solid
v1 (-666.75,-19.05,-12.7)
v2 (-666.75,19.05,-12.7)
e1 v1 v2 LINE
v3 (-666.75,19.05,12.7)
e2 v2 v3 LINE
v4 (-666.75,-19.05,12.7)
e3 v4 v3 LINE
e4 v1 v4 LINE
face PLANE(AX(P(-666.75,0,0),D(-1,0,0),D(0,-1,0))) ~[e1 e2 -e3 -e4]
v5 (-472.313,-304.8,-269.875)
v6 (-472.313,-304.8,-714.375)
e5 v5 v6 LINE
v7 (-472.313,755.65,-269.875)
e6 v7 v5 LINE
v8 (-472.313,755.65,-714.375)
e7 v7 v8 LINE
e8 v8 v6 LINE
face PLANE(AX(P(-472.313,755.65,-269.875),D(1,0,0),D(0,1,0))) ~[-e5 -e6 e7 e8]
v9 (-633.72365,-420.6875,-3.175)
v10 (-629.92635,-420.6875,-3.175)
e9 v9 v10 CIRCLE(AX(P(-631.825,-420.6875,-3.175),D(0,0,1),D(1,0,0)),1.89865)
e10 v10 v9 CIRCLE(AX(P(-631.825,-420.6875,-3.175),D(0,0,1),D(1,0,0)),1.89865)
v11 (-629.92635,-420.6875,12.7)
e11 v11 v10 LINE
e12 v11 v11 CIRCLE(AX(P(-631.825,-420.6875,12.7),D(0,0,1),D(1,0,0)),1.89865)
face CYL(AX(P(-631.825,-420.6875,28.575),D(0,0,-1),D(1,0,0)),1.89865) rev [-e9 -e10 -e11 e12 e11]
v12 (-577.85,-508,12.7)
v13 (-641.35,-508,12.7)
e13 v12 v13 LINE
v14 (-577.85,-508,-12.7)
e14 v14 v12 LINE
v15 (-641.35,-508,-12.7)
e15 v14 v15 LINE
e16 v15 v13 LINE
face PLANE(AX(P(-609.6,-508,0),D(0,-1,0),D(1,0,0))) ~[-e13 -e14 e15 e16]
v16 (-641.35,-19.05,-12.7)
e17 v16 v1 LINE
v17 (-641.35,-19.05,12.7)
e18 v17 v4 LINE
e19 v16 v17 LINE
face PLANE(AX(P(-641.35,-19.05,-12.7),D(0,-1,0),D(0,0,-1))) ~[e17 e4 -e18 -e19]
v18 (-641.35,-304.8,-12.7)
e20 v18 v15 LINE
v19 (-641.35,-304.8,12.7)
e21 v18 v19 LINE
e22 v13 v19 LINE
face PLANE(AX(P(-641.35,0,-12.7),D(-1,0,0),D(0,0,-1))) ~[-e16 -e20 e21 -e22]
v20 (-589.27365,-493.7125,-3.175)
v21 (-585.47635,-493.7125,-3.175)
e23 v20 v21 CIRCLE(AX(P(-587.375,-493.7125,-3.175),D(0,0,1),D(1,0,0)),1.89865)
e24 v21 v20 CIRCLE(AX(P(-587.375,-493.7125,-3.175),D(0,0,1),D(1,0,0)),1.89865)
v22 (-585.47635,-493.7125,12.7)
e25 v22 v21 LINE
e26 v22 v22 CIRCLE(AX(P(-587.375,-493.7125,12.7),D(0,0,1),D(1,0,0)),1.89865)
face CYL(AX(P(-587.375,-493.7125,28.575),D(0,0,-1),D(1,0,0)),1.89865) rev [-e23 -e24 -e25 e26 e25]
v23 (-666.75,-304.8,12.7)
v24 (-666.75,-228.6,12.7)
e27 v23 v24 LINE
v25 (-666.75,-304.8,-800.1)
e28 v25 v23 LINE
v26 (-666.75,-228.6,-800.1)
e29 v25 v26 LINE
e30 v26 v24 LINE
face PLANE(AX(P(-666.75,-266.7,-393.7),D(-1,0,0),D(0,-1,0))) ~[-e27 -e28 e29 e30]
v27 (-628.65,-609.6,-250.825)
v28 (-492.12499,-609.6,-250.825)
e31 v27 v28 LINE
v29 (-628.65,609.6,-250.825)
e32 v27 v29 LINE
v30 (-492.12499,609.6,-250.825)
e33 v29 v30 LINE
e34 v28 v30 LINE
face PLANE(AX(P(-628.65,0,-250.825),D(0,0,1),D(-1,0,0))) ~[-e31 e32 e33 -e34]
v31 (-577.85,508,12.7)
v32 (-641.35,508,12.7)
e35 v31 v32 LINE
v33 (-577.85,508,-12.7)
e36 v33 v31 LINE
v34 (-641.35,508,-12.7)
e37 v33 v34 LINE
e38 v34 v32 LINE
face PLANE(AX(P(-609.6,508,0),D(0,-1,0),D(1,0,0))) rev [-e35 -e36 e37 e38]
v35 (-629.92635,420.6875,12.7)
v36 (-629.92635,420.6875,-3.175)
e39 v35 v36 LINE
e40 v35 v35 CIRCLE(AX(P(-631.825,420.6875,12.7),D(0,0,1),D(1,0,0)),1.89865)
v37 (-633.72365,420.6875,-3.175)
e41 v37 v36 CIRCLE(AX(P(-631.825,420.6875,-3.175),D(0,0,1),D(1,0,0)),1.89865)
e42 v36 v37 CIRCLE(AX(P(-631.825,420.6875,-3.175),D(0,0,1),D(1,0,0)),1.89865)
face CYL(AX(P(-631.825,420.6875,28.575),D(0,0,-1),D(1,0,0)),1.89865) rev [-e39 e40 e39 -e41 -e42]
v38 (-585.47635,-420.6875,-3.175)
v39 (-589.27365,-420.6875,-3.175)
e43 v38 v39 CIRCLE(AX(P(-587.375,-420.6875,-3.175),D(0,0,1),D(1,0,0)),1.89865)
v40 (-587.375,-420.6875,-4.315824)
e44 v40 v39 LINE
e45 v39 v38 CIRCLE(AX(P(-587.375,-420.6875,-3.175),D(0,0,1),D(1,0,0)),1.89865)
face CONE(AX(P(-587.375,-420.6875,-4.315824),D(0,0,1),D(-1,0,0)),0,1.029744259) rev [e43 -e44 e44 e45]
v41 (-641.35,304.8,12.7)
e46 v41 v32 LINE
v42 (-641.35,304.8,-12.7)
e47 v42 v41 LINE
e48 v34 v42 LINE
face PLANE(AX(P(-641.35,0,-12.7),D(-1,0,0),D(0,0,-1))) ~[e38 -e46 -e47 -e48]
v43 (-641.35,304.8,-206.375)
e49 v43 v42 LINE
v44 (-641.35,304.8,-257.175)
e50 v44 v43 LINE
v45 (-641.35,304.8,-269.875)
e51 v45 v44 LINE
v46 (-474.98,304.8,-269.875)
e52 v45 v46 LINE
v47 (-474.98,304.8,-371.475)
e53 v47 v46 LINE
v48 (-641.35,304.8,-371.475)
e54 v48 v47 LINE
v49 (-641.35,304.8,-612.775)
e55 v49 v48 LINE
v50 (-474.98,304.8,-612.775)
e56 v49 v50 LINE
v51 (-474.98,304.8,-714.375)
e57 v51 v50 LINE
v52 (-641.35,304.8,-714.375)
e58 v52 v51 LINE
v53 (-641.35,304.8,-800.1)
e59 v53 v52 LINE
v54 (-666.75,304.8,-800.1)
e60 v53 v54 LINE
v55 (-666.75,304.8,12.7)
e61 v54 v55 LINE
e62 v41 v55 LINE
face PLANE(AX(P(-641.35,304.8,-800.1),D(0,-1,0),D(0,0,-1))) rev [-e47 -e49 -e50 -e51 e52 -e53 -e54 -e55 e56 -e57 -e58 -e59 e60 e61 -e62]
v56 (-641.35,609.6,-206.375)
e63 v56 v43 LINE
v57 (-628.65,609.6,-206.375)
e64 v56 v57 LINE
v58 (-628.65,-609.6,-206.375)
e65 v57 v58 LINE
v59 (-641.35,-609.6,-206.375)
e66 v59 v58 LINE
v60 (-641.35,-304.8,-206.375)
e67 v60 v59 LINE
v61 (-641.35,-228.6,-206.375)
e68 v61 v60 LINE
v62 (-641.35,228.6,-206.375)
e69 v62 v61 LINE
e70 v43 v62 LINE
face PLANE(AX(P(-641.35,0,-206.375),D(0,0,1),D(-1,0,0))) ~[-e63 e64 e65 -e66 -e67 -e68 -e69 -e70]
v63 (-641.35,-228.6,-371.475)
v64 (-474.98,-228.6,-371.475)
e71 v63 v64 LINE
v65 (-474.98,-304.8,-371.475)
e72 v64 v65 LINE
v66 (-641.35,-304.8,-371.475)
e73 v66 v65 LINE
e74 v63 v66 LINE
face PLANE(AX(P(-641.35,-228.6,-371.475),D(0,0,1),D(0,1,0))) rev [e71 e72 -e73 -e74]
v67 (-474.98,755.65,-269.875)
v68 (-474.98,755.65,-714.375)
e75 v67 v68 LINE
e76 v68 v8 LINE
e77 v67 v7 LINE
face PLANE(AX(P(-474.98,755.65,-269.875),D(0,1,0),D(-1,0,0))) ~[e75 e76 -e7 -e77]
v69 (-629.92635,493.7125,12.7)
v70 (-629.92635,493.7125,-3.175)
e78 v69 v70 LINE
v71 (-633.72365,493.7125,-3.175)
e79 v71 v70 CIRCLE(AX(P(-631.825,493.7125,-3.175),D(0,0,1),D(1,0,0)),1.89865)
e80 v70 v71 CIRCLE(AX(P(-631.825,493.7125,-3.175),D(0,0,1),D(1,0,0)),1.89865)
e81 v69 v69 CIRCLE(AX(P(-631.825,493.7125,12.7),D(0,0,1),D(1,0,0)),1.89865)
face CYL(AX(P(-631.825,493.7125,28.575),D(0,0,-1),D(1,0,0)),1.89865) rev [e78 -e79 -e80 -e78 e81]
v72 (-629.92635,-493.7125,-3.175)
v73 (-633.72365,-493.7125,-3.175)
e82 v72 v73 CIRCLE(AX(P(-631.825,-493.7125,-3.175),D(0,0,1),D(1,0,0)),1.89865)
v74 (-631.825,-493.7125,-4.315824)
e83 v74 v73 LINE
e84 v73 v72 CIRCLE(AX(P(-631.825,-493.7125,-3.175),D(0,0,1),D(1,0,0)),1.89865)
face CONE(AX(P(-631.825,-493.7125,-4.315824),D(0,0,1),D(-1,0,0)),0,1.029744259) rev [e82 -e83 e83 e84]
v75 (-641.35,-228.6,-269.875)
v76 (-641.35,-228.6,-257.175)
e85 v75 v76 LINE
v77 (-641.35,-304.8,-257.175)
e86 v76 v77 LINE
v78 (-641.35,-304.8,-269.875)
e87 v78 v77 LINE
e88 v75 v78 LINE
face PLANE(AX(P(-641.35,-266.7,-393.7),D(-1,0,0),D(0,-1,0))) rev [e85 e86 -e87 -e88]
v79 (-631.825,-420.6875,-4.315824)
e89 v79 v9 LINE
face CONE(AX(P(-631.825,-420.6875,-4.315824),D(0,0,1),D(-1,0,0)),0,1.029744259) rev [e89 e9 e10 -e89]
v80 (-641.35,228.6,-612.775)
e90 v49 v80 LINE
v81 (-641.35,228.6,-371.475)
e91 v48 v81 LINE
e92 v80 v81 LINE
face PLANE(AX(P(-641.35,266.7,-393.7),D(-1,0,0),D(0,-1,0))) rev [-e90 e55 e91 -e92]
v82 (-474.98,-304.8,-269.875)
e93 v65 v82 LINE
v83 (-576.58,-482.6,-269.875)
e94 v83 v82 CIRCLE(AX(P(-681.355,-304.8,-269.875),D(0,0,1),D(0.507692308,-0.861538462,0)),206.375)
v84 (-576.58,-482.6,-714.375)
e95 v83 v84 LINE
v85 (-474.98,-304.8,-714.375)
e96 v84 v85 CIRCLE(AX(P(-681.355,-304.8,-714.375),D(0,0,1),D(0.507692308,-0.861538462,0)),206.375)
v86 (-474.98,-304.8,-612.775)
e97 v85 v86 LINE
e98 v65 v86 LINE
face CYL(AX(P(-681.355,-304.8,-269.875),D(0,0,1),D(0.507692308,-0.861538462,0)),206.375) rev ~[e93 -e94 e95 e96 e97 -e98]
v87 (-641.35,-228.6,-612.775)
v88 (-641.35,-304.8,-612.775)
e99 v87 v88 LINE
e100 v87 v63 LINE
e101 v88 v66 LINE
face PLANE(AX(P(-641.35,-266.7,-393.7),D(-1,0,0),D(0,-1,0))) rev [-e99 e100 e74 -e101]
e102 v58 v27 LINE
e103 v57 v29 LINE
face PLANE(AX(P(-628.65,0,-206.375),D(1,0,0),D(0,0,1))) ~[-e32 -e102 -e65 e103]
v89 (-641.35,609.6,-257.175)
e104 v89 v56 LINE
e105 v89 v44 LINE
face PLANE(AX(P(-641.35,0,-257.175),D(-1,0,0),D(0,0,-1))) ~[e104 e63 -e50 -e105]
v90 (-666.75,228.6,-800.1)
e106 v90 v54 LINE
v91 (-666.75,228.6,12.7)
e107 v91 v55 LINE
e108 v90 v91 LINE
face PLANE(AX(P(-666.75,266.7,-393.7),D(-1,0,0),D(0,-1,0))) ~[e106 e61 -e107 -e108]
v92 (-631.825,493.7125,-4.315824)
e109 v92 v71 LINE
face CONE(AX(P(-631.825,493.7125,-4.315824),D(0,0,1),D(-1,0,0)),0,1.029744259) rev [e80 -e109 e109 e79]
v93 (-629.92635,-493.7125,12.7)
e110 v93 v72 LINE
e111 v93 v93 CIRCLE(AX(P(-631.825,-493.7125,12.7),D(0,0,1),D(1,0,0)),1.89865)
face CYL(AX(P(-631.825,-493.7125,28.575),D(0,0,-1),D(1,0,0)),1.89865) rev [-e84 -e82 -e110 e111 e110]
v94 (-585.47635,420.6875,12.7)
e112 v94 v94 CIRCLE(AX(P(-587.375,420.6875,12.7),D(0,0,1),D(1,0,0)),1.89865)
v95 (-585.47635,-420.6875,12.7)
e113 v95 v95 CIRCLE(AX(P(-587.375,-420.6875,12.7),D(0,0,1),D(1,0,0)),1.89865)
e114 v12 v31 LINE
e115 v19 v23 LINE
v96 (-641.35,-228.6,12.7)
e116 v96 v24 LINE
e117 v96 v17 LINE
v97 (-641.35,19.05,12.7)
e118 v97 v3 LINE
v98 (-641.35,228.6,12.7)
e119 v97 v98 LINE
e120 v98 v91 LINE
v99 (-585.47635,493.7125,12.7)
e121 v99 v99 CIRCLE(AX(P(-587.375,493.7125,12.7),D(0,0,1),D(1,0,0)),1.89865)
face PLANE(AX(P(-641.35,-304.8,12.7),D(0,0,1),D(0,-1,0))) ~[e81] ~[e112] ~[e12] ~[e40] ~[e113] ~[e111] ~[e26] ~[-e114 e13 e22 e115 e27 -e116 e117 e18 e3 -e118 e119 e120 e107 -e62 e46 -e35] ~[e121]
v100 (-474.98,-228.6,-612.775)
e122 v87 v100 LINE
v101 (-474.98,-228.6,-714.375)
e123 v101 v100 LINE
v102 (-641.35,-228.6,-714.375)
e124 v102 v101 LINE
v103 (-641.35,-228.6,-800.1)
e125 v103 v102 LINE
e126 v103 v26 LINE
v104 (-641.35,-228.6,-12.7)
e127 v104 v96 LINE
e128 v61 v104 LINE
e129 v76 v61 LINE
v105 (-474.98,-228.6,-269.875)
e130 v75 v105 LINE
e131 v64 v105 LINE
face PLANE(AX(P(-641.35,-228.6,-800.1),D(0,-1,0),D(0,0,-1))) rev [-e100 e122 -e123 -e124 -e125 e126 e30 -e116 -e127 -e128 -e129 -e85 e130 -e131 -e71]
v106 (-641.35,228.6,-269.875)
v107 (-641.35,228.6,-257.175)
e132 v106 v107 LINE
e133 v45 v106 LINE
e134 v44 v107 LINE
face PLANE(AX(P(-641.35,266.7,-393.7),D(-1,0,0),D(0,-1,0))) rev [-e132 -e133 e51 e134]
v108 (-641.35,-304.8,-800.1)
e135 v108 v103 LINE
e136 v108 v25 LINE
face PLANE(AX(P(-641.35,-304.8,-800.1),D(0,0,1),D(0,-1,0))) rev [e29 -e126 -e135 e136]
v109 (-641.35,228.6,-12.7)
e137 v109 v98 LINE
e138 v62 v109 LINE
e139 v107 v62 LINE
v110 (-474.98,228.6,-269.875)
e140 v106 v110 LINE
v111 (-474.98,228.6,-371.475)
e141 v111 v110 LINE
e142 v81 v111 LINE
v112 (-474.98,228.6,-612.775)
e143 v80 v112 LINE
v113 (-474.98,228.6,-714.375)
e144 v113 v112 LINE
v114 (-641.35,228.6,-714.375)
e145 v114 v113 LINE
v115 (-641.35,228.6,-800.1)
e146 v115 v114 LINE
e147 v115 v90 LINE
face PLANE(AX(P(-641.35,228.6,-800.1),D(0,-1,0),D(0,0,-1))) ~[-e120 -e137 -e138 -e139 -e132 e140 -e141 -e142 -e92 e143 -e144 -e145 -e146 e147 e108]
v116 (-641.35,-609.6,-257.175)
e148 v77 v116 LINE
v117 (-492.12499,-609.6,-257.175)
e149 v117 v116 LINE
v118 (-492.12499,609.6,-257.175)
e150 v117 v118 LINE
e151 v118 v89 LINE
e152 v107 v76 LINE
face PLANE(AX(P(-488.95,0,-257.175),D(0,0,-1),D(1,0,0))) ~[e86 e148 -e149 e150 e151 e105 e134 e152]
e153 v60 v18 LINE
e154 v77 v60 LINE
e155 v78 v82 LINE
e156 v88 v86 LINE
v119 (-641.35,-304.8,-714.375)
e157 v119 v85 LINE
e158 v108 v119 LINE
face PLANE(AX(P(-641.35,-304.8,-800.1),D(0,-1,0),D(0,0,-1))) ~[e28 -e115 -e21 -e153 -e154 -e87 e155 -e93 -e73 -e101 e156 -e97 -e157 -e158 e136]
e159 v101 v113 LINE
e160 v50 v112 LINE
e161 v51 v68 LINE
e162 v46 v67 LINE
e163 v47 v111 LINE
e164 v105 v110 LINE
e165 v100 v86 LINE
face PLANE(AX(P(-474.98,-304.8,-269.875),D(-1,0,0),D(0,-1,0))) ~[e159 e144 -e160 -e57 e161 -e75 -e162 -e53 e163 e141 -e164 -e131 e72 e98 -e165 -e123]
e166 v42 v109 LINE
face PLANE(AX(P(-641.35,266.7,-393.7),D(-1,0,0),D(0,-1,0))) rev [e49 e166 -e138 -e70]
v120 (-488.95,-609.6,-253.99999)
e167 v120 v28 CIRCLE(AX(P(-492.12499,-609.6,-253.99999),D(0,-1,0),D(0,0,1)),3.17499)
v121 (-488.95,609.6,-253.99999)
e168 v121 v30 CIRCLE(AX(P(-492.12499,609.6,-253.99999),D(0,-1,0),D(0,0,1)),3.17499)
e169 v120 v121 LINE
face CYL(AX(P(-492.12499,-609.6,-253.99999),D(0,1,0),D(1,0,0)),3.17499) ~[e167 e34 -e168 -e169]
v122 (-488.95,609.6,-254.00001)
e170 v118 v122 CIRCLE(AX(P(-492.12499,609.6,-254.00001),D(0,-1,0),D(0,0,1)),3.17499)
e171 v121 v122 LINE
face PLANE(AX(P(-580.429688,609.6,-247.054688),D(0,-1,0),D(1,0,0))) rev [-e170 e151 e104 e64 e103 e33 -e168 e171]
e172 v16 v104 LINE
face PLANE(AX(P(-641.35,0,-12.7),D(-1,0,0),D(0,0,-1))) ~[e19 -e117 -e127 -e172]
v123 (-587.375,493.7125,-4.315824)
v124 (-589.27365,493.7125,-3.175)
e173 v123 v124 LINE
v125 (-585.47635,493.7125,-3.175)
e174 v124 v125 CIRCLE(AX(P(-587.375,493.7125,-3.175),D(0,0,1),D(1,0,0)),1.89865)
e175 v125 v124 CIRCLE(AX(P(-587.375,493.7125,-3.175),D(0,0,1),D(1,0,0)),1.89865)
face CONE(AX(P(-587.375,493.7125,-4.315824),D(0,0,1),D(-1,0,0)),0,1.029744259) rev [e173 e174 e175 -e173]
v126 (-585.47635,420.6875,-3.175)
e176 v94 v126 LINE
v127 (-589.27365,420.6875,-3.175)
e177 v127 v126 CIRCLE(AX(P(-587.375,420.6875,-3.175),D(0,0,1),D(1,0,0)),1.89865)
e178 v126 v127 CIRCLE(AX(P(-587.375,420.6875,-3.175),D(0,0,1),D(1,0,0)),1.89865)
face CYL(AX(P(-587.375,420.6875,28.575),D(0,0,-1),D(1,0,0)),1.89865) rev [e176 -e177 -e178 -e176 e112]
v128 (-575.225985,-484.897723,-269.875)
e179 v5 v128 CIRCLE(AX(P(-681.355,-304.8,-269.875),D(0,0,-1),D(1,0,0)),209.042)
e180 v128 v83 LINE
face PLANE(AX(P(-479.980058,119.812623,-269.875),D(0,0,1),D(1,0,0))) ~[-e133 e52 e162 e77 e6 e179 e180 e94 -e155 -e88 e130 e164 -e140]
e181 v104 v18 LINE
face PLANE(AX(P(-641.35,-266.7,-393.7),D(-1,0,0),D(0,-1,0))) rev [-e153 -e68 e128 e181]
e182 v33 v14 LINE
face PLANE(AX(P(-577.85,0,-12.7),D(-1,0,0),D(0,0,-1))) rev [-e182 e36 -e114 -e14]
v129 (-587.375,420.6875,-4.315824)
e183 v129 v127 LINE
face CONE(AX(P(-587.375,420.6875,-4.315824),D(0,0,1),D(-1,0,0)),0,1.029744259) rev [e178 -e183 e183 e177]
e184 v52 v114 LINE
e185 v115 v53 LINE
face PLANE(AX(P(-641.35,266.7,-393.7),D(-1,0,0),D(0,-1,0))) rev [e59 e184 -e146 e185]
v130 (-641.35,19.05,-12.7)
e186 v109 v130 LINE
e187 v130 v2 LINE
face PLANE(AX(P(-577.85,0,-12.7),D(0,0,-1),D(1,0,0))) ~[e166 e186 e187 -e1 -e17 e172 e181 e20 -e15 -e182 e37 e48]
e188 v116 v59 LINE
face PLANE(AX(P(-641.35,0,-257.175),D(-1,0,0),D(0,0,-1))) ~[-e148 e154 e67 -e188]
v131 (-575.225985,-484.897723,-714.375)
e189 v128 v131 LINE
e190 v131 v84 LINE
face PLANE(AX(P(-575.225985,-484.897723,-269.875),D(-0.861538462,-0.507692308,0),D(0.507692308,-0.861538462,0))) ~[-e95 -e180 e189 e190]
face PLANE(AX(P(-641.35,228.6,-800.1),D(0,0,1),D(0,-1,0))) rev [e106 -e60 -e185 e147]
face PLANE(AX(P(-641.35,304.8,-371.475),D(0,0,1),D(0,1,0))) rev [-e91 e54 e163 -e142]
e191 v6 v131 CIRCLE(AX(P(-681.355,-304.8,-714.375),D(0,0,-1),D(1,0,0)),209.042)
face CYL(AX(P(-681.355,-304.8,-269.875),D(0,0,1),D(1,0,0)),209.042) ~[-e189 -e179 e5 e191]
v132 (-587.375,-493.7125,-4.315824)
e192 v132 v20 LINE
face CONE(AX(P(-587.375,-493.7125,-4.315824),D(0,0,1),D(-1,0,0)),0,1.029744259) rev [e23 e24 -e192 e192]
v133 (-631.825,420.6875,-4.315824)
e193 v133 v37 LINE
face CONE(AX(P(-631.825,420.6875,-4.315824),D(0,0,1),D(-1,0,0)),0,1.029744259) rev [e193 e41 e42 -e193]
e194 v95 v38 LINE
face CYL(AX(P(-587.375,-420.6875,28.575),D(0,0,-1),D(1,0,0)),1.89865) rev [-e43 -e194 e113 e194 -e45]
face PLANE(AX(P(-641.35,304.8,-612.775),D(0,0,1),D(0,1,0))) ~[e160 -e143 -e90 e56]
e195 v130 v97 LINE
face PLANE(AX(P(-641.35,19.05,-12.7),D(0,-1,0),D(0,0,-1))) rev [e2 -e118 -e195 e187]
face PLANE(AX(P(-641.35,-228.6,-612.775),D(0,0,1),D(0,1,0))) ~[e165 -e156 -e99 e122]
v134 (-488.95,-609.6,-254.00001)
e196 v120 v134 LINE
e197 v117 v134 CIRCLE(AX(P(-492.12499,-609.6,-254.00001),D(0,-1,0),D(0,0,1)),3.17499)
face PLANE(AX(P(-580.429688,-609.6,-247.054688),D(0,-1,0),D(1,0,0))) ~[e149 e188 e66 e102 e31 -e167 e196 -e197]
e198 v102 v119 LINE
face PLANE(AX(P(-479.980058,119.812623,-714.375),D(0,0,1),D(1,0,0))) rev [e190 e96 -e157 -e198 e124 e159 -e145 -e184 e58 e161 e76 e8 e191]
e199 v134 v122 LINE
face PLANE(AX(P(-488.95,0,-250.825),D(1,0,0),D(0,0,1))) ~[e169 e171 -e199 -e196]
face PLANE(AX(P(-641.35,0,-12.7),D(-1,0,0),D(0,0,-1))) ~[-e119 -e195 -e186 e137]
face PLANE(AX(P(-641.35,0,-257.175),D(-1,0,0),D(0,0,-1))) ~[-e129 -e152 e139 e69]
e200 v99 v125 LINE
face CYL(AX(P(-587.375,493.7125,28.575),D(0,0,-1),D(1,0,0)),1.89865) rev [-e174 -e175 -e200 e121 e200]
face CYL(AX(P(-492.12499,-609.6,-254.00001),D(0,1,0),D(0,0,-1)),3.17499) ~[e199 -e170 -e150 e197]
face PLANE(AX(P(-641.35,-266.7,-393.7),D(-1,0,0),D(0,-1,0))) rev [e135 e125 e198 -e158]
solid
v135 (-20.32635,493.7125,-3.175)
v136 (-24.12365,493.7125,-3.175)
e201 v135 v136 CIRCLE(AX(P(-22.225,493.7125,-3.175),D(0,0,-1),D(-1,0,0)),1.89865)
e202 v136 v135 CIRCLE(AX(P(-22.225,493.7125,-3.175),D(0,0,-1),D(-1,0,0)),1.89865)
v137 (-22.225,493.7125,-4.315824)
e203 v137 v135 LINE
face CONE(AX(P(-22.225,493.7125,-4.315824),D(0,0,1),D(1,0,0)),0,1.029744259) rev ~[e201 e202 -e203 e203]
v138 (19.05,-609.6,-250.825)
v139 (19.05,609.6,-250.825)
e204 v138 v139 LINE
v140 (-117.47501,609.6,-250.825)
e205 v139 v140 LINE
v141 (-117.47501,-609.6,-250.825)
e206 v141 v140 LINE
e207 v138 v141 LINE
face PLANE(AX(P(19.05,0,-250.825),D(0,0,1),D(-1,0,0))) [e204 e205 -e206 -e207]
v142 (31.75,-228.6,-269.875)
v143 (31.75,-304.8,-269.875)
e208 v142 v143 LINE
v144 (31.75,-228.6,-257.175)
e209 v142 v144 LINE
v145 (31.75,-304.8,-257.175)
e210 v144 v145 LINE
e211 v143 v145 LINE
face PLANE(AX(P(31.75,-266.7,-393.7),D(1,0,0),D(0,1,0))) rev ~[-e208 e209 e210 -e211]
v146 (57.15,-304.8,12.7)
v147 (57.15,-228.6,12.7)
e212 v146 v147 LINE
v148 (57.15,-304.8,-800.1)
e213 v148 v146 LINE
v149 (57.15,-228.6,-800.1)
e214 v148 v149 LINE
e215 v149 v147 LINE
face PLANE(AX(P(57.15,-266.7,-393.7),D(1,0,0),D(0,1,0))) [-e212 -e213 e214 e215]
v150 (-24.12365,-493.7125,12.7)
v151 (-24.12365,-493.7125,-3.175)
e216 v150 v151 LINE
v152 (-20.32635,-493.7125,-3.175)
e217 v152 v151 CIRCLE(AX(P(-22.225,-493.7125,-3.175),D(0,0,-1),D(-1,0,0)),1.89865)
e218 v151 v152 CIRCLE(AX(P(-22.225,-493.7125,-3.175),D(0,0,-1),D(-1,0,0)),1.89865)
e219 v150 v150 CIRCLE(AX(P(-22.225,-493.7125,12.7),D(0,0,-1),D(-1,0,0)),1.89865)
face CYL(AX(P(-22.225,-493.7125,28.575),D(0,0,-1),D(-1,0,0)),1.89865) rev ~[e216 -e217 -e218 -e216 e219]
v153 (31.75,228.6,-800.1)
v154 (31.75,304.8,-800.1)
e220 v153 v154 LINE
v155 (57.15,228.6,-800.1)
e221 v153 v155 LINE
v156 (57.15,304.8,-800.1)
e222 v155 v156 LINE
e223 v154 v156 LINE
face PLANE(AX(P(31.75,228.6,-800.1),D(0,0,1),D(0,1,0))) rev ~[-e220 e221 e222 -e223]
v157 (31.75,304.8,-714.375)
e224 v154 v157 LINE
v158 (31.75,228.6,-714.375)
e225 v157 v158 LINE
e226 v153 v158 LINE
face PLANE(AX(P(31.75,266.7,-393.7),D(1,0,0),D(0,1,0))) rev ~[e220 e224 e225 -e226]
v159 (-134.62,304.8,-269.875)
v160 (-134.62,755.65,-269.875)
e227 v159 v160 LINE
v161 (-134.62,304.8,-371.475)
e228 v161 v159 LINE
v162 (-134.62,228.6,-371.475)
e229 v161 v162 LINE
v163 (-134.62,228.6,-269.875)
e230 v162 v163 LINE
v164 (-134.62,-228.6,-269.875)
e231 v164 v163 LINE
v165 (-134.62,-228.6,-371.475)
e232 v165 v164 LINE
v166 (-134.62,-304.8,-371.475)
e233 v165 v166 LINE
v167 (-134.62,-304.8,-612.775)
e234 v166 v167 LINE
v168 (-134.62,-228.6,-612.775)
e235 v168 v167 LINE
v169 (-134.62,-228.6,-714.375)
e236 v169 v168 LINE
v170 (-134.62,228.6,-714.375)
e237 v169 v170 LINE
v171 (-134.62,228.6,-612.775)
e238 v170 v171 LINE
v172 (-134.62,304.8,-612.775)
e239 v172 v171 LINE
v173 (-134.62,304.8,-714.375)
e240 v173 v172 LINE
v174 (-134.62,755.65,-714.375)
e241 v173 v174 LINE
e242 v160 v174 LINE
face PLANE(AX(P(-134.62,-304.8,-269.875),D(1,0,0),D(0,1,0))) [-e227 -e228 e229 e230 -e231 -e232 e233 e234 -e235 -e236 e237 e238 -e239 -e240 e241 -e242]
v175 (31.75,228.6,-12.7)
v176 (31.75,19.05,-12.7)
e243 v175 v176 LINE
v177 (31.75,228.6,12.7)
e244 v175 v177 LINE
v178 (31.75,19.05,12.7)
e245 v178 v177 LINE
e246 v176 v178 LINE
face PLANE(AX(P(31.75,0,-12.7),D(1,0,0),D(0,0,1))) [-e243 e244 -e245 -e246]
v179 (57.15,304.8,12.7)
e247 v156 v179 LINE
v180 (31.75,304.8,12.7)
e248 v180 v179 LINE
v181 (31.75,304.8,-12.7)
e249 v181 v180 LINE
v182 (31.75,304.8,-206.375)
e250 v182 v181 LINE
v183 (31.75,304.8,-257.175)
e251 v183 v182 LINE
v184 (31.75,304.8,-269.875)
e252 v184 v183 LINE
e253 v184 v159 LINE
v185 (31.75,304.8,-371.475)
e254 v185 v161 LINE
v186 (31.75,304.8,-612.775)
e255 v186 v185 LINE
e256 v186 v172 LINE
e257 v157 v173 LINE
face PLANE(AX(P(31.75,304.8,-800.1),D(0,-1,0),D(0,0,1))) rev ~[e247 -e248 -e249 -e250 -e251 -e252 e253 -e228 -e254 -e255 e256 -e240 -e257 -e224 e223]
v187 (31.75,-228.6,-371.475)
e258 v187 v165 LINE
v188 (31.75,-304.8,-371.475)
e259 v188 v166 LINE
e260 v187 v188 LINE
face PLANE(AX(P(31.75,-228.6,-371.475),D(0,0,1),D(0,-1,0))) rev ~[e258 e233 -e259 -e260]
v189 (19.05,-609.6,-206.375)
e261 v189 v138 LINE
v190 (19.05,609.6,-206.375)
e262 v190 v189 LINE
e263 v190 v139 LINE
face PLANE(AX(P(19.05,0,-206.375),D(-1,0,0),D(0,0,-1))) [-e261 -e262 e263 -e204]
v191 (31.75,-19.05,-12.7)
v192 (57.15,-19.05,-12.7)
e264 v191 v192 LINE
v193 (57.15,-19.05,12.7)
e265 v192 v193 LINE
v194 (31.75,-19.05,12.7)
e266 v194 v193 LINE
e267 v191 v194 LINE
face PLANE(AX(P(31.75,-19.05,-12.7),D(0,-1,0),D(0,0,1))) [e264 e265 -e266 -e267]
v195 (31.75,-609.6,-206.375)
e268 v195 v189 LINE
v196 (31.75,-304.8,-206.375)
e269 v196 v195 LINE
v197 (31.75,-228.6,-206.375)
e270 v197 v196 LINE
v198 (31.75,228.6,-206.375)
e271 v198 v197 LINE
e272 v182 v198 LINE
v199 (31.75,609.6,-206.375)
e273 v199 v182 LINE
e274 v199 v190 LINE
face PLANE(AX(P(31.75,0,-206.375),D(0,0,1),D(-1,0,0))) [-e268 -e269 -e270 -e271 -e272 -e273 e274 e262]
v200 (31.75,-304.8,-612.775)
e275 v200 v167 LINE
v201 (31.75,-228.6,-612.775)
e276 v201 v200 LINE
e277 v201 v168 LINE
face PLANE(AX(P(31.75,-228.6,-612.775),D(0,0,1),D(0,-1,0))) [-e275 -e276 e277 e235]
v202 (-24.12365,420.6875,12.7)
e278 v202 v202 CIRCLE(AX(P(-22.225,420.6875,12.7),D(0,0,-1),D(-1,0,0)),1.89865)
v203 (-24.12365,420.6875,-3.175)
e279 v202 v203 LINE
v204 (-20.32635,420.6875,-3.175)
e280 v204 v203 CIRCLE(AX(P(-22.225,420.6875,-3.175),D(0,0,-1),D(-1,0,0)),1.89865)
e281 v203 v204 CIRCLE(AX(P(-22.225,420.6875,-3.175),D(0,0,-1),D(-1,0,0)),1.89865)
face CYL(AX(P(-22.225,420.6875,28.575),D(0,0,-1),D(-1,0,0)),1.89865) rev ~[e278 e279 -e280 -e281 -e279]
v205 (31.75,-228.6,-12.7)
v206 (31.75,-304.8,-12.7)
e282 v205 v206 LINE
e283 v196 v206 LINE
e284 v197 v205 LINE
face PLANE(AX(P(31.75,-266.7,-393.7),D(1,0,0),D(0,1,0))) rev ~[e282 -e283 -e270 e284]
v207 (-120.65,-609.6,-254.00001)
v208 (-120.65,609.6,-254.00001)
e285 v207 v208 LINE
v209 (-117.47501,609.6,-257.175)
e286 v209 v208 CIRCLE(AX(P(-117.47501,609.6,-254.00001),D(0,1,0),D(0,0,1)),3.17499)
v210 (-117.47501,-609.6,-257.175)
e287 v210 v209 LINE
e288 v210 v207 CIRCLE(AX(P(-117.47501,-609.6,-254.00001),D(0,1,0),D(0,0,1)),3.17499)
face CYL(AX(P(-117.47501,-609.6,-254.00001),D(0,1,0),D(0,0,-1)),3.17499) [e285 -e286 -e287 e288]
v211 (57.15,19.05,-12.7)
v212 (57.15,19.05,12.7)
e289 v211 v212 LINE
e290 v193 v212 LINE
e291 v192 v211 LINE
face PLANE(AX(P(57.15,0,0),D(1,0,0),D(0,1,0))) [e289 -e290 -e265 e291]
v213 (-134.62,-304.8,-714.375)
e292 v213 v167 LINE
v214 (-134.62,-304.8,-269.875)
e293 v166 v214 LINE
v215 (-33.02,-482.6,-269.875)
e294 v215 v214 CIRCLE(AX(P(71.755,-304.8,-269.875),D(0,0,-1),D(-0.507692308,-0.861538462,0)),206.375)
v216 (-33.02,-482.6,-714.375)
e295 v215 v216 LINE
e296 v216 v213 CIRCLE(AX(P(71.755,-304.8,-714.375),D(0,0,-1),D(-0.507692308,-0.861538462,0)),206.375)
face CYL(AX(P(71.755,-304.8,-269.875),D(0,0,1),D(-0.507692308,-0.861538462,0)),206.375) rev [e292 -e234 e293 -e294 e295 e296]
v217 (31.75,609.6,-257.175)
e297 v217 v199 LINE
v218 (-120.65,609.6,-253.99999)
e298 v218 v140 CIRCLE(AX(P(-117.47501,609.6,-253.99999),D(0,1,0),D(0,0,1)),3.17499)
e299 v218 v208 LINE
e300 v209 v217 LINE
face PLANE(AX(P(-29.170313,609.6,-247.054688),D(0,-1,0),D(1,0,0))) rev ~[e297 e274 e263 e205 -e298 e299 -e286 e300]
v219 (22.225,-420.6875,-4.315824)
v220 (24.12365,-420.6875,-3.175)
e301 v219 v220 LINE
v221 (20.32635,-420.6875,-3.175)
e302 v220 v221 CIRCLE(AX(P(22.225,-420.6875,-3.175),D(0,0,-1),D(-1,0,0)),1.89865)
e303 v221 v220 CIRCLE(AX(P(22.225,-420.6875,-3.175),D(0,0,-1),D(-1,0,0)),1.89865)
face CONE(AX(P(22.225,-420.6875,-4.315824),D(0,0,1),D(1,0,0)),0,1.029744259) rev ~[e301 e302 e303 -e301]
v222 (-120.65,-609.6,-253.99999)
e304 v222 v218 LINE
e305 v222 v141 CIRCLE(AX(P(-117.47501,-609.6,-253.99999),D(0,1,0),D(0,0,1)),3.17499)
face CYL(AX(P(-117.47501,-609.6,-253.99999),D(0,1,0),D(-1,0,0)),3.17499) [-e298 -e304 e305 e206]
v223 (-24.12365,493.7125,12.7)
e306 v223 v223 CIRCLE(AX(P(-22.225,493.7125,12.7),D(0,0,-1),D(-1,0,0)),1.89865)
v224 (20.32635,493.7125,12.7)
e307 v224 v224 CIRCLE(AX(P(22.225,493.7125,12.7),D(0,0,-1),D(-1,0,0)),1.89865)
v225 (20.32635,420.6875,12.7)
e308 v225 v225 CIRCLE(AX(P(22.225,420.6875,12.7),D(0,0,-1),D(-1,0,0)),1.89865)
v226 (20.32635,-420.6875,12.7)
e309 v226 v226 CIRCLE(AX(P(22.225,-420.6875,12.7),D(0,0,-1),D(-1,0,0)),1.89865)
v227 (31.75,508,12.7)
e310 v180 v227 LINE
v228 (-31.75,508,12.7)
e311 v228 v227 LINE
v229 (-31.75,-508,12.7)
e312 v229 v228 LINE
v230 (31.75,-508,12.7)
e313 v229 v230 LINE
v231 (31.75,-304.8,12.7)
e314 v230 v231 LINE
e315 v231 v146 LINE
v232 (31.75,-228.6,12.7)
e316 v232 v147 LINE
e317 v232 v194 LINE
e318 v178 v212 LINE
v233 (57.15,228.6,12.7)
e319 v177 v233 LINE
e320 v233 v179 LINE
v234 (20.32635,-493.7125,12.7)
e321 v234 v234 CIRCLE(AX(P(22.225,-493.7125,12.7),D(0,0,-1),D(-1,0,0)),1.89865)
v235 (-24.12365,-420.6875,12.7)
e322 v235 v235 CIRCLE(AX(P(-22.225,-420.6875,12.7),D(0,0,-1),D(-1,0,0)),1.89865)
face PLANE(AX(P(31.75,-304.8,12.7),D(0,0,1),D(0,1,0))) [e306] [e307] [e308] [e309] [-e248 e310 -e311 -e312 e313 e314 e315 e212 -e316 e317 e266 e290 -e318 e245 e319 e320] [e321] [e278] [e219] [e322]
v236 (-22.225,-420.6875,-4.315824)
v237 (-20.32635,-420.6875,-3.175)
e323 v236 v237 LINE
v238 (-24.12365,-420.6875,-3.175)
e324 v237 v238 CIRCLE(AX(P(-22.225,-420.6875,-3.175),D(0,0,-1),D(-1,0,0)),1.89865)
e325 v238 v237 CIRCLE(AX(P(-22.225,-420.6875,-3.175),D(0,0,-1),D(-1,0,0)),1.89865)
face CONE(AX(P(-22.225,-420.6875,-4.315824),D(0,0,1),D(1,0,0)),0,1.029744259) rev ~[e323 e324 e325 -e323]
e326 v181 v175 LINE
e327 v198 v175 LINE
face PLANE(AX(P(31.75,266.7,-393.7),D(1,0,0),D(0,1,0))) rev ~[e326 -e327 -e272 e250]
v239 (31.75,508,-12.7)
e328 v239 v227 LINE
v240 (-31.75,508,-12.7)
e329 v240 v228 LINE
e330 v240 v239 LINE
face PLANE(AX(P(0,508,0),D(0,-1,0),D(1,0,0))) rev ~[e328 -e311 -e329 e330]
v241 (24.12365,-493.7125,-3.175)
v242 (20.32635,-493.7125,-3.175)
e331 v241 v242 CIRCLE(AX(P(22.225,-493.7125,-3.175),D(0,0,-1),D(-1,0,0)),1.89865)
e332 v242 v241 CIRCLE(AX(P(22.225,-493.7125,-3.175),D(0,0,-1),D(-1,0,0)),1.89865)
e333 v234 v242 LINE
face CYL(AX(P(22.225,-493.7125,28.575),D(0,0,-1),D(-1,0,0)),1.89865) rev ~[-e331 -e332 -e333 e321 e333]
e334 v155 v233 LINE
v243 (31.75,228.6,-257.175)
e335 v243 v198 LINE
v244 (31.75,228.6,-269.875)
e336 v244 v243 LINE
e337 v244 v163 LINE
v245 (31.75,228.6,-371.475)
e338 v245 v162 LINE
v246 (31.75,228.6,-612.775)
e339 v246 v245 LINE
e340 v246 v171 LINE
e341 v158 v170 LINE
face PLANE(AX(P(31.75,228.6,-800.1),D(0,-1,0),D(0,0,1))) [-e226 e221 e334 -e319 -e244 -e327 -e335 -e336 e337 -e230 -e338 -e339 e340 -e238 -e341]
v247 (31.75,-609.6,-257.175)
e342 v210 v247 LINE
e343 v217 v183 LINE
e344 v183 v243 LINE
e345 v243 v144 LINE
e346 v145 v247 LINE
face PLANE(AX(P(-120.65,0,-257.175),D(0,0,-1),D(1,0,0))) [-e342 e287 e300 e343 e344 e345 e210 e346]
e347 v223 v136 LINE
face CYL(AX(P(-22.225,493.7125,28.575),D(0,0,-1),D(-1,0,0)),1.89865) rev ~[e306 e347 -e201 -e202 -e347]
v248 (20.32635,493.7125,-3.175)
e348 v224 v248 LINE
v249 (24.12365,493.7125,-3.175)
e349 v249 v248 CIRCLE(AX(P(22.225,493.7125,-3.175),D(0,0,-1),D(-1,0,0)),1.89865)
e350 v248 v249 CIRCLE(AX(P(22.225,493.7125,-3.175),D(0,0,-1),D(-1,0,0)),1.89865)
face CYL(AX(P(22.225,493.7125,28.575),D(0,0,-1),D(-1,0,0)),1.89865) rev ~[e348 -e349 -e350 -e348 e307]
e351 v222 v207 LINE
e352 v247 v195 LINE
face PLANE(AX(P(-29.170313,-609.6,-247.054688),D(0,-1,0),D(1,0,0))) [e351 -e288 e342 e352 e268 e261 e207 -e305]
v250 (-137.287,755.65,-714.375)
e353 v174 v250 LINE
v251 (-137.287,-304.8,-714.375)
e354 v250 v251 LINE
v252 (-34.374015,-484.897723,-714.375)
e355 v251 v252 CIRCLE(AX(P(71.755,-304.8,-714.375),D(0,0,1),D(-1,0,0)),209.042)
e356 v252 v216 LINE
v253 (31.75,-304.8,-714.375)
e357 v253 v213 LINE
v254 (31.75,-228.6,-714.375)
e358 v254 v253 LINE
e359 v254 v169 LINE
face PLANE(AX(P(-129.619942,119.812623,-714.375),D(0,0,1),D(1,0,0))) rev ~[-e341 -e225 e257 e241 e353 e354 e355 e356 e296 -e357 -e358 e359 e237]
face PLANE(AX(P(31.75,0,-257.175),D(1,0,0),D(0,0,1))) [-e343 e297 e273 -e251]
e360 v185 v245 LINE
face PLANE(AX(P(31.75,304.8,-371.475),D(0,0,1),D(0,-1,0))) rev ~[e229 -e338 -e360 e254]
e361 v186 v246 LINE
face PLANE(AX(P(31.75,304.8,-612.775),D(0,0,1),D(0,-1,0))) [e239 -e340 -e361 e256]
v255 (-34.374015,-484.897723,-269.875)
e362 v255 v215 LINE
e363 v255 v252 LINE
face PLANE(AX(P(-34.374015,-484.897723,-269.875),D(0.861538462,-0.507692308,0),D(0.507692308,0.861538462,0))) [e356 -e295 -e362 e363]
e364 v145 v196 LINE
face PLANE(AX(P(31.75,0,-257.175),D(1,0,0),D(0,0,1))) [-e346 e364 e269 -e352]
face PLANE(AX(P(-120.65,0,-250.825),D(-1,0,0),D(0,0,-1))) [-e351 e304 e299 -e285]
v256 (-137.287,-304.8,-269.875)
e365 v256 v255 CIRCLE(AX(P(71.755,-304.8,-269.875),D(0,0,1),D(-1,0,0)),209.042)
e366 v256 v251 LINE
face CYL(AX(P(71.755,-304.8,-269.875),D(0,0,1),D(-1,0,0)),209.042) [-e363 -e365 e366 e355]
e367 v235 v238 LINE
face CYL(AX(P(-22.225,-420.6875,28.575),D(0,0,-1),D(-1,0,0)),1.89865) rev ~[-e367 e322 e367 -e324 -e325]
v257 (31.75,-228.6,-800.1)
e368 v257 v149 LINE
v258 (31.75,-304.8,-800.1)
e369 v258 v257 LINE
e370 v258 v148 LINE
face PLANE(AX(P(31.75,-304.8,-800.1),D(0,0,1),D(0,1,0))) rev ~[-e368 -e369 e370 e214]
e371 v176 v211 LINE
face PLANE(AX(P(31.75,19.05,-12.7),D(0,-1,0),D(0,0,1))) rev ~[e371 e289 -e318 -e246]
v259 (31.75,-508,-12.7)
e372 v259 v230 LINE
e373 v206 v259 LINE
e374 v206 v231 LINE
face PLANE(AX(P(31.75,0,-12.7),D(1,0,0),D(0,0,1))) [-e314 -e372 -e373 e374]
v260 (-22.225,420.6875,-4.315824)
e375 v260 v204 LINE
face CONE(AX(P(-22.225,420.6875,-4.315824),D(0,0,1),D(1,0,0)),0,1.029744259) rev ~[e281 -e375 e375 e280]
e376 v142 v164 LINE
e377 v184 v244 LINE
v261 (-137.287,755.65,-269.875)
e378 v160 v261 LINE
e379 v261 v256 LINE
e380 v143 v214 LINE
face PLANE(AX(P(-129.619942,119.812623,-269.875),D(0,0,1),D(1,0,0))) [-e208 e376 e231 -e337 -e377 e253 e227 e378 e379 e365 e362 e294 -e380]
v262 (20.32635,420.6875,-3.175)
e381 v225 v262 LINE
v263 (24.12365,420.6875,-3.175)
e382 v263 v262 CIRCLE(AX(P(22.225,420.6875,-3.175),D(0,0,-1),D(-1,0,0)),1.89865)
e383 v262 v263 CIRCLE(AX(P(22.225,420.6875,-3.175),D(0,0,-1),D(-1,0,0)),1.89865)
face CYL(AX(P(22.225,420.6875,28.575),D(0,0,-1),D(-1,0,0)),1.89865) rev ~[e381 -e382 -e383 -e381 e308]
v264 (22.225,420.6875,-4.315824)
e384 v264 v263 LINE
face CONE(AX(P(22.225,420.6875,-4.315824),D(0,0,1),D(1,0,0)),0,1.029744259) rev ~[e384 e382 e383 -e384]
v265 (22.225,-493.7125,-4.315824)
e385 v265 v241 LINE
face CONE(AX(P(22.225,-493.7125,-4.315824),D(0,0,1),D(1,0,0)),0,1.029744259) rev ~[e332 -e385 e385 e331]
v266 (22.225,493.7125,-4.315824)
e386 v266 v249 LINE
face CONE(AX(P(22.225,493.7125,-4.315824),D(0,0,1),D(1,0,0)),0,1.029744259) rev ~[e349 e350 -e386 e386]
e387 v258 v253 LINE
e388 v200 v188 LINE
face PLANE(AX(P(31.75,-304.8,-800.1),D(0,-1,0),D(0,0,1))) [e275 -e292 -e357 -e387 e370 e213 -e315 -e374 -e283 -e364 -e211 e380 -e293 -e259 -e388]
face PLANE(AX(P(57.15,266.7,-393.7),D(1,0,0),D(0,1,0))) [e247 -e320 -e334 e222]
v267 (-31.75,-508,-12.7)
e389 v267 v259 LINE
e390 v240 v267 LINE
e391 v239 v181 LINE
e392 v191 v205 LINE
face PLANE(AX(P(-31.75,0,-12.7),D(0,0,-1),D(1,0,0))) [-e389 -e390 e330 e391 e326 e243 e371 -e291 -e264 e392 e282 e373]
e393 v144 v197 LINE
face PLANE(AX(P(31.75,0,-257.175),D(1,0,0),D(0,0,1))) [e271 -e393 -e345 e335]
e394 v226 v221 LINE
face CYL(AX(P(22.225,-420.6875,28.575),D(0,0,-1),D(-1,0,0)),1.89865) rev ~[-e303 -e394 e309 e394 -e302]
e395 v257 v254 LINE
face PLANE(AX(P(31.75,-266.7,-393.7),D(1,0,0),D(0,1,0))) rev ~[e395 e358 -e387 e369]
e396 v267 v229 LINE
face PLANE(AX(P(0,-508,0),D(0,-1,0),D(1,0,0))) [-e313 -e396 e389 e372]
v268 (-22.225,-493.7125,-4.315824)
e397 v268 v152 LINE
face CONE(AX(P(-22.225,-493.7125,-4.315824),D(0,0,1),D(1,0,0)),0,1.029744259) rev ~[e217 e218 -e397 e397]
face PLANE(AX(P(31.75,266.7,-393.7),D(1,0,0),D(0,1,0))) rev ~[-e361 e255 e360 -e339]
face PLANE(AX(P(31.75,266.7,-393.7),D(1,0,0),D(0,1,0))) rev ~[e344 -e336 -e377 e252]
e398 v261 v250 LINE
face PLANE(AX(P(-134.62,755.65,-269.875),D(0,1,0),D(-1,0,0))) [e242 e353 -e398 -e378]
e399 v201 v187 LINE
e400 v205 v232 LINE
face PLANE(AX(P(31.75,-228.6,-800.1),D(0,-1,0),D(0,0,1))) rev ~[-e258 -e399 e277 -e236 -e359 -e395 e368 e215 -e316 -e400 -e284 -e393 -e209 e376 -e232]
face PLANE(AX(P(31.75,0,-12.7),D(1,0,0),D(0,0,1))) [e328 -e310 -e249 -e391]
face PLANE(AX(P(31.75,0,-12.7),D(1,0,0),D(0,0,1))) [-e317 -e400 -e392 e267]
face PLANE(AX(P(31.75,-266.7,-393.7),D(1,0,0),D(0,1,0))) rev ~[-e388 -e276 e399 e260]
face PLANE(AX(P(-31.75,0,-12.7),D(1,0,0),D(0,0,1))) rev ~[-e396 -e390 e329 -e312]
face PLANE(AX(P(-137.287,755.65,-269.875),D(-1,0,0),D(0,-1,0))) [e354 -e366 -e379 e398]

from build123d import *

# Parameters (mm, degrees)
F0_W      = 63.5
F0_H      = 25.4
F1_DEPTH  = 508
F2_W      = 76.2
F2_H      = 812.8
F3_DEPTH  = 25.4
F5_D      = 3.7973
F5_DEPTH  = 15.875
F5_TIP    = 1.1408240143
F7_DEPTH  = 609.6
F8_R      = 3.17499
F9_W      = 76.2
F9_H      = 101.6
F10_DEPTH = 166.37
F12_DEPTH = 444.5
F13_W     = 38.1
F13_H     = 25.4
F14_DEPTH = 25.4


# Not quite as in the source:
# - a fillet or chamfer is up to 0.001 mm smaller than in the source, because OpenCascade refuses the exact size


with BuildPart() as f1:
    # F0 (on Front) → F1 (new body, symmetric)
    with BuildSketch(Plane.XZ):
        Rectangle(F0_W, F0_H)
    extrude(amount=F1_DEPTH, both=True)

    # F2 (on face) → F3 (join)
    with BuildSketch(Plane.YZ.offset(31.75)):
        with Locations((-266.7, -393.7)):
            Rectangle(F2_W, F2_H)
        with Locations((266.7, -393.7)):
            Rectangle(F2_W, F2_H)
    extrude(amount=F3_DEPTH)

    # F5
    with Locations(Plane.XY.offset(12.7)):
        with Locations((22.225, 420.6875), (-22.225, 420.6875), (22.225, 493.7125), (-22.225, 493.7125), (22.225, -420.6875), (-22.225, -420.6875), (-22.225, -493.7125), (22.225, -493.7125)):
            Hole(F5_D / 2, depth=F5_DEPTH)
            with Locations((0, 0, -(F5_DEPTH + F5_TIP / 2))):  # 118° drill point
                Cone(0, F5_D / 2, F5_TIP, mode=Mode.SUBTRACT)

    # F6 (on Front) → F7 (join, symmetric)
    with BuildSketch(Plane.XZ):
        Polygon((-120.65, -257.175), (31.75, -257.175), (31.75, -206.375), (19.05, -206.375), (19.05, -250.825), (-120.65, -250.825), align=None)
    extrude(amount=F7_DEPTH, both=True)

    # F8 (radius 3.175 in the source; OpenCascade refuses exactly that, so slightly less here)
    f8_edges = [f1.edges().sort_by_distance(p)[0] for p in [
        (-120.65, 0, -257.175),
        (-120.65, 0, -250.825),
    ]]
    fillet(f8_edges, radius=F8_R)

    # F9 (on face) → F10 (join)
    with BuildSketch(Plane(origin=(31.75, 0, 0), x_dir=(0, -1, 0), z_dir=(-1, 0, 0))):
        with Locations((-266.7, -320.675)):
            Rectangle(F9_W, F9_H)
        with Locations((266.7, -320.675)):
            Rectangle(F9_W, F9_H)
        with Locations((-266.7, -663.575)):
            Rectangle(F9_W, F9_H)
        with Locations((266.7, -663.575)):
            Rectangle(F9_W, F9_H)
    extrude(amount=F10_DEPTH)

    # F11 (on face) → F12 (join, through all)
    with BuildSketch(Plane.XY.offset(-269.875)):
        with BuildLine():
            ThreePointArc((-33.02, -482.6), (-107.4286784559, -407.1906734034), (-134.62, -304.8))
            Line((-134.62, -304.8), (-134.62, 755.65))
            Line((-134.62, 755.65), (-137.287, 755.65))
            Line((-137.287, 755.65), (-137.287, -304.8))
            ThreePointArc((-137.287, -304.8), (-109.744282916, -408.513875952), (-34.3740153846, -484.8977230769))
            Line((-34.3740153846, -484.8977230769), (-33.02, -482.6))
        make_face()
    extrude(amount=-F12_DEPTH)

    # F13 (on face) → F14 (join, through all)
    with BuildSketch(Plane.YZ.offset(31.75)):
        Rectangle(F13_W, F13_H)
    extrude(amount=F14_DEPTH)


with BuildPart() as f16_1:
    # F16: instance of F1
    add(f1.part.mirror(Plane.YZ.offset(-304.8)))


solid = Compound([f1.part, f16_1.part])
